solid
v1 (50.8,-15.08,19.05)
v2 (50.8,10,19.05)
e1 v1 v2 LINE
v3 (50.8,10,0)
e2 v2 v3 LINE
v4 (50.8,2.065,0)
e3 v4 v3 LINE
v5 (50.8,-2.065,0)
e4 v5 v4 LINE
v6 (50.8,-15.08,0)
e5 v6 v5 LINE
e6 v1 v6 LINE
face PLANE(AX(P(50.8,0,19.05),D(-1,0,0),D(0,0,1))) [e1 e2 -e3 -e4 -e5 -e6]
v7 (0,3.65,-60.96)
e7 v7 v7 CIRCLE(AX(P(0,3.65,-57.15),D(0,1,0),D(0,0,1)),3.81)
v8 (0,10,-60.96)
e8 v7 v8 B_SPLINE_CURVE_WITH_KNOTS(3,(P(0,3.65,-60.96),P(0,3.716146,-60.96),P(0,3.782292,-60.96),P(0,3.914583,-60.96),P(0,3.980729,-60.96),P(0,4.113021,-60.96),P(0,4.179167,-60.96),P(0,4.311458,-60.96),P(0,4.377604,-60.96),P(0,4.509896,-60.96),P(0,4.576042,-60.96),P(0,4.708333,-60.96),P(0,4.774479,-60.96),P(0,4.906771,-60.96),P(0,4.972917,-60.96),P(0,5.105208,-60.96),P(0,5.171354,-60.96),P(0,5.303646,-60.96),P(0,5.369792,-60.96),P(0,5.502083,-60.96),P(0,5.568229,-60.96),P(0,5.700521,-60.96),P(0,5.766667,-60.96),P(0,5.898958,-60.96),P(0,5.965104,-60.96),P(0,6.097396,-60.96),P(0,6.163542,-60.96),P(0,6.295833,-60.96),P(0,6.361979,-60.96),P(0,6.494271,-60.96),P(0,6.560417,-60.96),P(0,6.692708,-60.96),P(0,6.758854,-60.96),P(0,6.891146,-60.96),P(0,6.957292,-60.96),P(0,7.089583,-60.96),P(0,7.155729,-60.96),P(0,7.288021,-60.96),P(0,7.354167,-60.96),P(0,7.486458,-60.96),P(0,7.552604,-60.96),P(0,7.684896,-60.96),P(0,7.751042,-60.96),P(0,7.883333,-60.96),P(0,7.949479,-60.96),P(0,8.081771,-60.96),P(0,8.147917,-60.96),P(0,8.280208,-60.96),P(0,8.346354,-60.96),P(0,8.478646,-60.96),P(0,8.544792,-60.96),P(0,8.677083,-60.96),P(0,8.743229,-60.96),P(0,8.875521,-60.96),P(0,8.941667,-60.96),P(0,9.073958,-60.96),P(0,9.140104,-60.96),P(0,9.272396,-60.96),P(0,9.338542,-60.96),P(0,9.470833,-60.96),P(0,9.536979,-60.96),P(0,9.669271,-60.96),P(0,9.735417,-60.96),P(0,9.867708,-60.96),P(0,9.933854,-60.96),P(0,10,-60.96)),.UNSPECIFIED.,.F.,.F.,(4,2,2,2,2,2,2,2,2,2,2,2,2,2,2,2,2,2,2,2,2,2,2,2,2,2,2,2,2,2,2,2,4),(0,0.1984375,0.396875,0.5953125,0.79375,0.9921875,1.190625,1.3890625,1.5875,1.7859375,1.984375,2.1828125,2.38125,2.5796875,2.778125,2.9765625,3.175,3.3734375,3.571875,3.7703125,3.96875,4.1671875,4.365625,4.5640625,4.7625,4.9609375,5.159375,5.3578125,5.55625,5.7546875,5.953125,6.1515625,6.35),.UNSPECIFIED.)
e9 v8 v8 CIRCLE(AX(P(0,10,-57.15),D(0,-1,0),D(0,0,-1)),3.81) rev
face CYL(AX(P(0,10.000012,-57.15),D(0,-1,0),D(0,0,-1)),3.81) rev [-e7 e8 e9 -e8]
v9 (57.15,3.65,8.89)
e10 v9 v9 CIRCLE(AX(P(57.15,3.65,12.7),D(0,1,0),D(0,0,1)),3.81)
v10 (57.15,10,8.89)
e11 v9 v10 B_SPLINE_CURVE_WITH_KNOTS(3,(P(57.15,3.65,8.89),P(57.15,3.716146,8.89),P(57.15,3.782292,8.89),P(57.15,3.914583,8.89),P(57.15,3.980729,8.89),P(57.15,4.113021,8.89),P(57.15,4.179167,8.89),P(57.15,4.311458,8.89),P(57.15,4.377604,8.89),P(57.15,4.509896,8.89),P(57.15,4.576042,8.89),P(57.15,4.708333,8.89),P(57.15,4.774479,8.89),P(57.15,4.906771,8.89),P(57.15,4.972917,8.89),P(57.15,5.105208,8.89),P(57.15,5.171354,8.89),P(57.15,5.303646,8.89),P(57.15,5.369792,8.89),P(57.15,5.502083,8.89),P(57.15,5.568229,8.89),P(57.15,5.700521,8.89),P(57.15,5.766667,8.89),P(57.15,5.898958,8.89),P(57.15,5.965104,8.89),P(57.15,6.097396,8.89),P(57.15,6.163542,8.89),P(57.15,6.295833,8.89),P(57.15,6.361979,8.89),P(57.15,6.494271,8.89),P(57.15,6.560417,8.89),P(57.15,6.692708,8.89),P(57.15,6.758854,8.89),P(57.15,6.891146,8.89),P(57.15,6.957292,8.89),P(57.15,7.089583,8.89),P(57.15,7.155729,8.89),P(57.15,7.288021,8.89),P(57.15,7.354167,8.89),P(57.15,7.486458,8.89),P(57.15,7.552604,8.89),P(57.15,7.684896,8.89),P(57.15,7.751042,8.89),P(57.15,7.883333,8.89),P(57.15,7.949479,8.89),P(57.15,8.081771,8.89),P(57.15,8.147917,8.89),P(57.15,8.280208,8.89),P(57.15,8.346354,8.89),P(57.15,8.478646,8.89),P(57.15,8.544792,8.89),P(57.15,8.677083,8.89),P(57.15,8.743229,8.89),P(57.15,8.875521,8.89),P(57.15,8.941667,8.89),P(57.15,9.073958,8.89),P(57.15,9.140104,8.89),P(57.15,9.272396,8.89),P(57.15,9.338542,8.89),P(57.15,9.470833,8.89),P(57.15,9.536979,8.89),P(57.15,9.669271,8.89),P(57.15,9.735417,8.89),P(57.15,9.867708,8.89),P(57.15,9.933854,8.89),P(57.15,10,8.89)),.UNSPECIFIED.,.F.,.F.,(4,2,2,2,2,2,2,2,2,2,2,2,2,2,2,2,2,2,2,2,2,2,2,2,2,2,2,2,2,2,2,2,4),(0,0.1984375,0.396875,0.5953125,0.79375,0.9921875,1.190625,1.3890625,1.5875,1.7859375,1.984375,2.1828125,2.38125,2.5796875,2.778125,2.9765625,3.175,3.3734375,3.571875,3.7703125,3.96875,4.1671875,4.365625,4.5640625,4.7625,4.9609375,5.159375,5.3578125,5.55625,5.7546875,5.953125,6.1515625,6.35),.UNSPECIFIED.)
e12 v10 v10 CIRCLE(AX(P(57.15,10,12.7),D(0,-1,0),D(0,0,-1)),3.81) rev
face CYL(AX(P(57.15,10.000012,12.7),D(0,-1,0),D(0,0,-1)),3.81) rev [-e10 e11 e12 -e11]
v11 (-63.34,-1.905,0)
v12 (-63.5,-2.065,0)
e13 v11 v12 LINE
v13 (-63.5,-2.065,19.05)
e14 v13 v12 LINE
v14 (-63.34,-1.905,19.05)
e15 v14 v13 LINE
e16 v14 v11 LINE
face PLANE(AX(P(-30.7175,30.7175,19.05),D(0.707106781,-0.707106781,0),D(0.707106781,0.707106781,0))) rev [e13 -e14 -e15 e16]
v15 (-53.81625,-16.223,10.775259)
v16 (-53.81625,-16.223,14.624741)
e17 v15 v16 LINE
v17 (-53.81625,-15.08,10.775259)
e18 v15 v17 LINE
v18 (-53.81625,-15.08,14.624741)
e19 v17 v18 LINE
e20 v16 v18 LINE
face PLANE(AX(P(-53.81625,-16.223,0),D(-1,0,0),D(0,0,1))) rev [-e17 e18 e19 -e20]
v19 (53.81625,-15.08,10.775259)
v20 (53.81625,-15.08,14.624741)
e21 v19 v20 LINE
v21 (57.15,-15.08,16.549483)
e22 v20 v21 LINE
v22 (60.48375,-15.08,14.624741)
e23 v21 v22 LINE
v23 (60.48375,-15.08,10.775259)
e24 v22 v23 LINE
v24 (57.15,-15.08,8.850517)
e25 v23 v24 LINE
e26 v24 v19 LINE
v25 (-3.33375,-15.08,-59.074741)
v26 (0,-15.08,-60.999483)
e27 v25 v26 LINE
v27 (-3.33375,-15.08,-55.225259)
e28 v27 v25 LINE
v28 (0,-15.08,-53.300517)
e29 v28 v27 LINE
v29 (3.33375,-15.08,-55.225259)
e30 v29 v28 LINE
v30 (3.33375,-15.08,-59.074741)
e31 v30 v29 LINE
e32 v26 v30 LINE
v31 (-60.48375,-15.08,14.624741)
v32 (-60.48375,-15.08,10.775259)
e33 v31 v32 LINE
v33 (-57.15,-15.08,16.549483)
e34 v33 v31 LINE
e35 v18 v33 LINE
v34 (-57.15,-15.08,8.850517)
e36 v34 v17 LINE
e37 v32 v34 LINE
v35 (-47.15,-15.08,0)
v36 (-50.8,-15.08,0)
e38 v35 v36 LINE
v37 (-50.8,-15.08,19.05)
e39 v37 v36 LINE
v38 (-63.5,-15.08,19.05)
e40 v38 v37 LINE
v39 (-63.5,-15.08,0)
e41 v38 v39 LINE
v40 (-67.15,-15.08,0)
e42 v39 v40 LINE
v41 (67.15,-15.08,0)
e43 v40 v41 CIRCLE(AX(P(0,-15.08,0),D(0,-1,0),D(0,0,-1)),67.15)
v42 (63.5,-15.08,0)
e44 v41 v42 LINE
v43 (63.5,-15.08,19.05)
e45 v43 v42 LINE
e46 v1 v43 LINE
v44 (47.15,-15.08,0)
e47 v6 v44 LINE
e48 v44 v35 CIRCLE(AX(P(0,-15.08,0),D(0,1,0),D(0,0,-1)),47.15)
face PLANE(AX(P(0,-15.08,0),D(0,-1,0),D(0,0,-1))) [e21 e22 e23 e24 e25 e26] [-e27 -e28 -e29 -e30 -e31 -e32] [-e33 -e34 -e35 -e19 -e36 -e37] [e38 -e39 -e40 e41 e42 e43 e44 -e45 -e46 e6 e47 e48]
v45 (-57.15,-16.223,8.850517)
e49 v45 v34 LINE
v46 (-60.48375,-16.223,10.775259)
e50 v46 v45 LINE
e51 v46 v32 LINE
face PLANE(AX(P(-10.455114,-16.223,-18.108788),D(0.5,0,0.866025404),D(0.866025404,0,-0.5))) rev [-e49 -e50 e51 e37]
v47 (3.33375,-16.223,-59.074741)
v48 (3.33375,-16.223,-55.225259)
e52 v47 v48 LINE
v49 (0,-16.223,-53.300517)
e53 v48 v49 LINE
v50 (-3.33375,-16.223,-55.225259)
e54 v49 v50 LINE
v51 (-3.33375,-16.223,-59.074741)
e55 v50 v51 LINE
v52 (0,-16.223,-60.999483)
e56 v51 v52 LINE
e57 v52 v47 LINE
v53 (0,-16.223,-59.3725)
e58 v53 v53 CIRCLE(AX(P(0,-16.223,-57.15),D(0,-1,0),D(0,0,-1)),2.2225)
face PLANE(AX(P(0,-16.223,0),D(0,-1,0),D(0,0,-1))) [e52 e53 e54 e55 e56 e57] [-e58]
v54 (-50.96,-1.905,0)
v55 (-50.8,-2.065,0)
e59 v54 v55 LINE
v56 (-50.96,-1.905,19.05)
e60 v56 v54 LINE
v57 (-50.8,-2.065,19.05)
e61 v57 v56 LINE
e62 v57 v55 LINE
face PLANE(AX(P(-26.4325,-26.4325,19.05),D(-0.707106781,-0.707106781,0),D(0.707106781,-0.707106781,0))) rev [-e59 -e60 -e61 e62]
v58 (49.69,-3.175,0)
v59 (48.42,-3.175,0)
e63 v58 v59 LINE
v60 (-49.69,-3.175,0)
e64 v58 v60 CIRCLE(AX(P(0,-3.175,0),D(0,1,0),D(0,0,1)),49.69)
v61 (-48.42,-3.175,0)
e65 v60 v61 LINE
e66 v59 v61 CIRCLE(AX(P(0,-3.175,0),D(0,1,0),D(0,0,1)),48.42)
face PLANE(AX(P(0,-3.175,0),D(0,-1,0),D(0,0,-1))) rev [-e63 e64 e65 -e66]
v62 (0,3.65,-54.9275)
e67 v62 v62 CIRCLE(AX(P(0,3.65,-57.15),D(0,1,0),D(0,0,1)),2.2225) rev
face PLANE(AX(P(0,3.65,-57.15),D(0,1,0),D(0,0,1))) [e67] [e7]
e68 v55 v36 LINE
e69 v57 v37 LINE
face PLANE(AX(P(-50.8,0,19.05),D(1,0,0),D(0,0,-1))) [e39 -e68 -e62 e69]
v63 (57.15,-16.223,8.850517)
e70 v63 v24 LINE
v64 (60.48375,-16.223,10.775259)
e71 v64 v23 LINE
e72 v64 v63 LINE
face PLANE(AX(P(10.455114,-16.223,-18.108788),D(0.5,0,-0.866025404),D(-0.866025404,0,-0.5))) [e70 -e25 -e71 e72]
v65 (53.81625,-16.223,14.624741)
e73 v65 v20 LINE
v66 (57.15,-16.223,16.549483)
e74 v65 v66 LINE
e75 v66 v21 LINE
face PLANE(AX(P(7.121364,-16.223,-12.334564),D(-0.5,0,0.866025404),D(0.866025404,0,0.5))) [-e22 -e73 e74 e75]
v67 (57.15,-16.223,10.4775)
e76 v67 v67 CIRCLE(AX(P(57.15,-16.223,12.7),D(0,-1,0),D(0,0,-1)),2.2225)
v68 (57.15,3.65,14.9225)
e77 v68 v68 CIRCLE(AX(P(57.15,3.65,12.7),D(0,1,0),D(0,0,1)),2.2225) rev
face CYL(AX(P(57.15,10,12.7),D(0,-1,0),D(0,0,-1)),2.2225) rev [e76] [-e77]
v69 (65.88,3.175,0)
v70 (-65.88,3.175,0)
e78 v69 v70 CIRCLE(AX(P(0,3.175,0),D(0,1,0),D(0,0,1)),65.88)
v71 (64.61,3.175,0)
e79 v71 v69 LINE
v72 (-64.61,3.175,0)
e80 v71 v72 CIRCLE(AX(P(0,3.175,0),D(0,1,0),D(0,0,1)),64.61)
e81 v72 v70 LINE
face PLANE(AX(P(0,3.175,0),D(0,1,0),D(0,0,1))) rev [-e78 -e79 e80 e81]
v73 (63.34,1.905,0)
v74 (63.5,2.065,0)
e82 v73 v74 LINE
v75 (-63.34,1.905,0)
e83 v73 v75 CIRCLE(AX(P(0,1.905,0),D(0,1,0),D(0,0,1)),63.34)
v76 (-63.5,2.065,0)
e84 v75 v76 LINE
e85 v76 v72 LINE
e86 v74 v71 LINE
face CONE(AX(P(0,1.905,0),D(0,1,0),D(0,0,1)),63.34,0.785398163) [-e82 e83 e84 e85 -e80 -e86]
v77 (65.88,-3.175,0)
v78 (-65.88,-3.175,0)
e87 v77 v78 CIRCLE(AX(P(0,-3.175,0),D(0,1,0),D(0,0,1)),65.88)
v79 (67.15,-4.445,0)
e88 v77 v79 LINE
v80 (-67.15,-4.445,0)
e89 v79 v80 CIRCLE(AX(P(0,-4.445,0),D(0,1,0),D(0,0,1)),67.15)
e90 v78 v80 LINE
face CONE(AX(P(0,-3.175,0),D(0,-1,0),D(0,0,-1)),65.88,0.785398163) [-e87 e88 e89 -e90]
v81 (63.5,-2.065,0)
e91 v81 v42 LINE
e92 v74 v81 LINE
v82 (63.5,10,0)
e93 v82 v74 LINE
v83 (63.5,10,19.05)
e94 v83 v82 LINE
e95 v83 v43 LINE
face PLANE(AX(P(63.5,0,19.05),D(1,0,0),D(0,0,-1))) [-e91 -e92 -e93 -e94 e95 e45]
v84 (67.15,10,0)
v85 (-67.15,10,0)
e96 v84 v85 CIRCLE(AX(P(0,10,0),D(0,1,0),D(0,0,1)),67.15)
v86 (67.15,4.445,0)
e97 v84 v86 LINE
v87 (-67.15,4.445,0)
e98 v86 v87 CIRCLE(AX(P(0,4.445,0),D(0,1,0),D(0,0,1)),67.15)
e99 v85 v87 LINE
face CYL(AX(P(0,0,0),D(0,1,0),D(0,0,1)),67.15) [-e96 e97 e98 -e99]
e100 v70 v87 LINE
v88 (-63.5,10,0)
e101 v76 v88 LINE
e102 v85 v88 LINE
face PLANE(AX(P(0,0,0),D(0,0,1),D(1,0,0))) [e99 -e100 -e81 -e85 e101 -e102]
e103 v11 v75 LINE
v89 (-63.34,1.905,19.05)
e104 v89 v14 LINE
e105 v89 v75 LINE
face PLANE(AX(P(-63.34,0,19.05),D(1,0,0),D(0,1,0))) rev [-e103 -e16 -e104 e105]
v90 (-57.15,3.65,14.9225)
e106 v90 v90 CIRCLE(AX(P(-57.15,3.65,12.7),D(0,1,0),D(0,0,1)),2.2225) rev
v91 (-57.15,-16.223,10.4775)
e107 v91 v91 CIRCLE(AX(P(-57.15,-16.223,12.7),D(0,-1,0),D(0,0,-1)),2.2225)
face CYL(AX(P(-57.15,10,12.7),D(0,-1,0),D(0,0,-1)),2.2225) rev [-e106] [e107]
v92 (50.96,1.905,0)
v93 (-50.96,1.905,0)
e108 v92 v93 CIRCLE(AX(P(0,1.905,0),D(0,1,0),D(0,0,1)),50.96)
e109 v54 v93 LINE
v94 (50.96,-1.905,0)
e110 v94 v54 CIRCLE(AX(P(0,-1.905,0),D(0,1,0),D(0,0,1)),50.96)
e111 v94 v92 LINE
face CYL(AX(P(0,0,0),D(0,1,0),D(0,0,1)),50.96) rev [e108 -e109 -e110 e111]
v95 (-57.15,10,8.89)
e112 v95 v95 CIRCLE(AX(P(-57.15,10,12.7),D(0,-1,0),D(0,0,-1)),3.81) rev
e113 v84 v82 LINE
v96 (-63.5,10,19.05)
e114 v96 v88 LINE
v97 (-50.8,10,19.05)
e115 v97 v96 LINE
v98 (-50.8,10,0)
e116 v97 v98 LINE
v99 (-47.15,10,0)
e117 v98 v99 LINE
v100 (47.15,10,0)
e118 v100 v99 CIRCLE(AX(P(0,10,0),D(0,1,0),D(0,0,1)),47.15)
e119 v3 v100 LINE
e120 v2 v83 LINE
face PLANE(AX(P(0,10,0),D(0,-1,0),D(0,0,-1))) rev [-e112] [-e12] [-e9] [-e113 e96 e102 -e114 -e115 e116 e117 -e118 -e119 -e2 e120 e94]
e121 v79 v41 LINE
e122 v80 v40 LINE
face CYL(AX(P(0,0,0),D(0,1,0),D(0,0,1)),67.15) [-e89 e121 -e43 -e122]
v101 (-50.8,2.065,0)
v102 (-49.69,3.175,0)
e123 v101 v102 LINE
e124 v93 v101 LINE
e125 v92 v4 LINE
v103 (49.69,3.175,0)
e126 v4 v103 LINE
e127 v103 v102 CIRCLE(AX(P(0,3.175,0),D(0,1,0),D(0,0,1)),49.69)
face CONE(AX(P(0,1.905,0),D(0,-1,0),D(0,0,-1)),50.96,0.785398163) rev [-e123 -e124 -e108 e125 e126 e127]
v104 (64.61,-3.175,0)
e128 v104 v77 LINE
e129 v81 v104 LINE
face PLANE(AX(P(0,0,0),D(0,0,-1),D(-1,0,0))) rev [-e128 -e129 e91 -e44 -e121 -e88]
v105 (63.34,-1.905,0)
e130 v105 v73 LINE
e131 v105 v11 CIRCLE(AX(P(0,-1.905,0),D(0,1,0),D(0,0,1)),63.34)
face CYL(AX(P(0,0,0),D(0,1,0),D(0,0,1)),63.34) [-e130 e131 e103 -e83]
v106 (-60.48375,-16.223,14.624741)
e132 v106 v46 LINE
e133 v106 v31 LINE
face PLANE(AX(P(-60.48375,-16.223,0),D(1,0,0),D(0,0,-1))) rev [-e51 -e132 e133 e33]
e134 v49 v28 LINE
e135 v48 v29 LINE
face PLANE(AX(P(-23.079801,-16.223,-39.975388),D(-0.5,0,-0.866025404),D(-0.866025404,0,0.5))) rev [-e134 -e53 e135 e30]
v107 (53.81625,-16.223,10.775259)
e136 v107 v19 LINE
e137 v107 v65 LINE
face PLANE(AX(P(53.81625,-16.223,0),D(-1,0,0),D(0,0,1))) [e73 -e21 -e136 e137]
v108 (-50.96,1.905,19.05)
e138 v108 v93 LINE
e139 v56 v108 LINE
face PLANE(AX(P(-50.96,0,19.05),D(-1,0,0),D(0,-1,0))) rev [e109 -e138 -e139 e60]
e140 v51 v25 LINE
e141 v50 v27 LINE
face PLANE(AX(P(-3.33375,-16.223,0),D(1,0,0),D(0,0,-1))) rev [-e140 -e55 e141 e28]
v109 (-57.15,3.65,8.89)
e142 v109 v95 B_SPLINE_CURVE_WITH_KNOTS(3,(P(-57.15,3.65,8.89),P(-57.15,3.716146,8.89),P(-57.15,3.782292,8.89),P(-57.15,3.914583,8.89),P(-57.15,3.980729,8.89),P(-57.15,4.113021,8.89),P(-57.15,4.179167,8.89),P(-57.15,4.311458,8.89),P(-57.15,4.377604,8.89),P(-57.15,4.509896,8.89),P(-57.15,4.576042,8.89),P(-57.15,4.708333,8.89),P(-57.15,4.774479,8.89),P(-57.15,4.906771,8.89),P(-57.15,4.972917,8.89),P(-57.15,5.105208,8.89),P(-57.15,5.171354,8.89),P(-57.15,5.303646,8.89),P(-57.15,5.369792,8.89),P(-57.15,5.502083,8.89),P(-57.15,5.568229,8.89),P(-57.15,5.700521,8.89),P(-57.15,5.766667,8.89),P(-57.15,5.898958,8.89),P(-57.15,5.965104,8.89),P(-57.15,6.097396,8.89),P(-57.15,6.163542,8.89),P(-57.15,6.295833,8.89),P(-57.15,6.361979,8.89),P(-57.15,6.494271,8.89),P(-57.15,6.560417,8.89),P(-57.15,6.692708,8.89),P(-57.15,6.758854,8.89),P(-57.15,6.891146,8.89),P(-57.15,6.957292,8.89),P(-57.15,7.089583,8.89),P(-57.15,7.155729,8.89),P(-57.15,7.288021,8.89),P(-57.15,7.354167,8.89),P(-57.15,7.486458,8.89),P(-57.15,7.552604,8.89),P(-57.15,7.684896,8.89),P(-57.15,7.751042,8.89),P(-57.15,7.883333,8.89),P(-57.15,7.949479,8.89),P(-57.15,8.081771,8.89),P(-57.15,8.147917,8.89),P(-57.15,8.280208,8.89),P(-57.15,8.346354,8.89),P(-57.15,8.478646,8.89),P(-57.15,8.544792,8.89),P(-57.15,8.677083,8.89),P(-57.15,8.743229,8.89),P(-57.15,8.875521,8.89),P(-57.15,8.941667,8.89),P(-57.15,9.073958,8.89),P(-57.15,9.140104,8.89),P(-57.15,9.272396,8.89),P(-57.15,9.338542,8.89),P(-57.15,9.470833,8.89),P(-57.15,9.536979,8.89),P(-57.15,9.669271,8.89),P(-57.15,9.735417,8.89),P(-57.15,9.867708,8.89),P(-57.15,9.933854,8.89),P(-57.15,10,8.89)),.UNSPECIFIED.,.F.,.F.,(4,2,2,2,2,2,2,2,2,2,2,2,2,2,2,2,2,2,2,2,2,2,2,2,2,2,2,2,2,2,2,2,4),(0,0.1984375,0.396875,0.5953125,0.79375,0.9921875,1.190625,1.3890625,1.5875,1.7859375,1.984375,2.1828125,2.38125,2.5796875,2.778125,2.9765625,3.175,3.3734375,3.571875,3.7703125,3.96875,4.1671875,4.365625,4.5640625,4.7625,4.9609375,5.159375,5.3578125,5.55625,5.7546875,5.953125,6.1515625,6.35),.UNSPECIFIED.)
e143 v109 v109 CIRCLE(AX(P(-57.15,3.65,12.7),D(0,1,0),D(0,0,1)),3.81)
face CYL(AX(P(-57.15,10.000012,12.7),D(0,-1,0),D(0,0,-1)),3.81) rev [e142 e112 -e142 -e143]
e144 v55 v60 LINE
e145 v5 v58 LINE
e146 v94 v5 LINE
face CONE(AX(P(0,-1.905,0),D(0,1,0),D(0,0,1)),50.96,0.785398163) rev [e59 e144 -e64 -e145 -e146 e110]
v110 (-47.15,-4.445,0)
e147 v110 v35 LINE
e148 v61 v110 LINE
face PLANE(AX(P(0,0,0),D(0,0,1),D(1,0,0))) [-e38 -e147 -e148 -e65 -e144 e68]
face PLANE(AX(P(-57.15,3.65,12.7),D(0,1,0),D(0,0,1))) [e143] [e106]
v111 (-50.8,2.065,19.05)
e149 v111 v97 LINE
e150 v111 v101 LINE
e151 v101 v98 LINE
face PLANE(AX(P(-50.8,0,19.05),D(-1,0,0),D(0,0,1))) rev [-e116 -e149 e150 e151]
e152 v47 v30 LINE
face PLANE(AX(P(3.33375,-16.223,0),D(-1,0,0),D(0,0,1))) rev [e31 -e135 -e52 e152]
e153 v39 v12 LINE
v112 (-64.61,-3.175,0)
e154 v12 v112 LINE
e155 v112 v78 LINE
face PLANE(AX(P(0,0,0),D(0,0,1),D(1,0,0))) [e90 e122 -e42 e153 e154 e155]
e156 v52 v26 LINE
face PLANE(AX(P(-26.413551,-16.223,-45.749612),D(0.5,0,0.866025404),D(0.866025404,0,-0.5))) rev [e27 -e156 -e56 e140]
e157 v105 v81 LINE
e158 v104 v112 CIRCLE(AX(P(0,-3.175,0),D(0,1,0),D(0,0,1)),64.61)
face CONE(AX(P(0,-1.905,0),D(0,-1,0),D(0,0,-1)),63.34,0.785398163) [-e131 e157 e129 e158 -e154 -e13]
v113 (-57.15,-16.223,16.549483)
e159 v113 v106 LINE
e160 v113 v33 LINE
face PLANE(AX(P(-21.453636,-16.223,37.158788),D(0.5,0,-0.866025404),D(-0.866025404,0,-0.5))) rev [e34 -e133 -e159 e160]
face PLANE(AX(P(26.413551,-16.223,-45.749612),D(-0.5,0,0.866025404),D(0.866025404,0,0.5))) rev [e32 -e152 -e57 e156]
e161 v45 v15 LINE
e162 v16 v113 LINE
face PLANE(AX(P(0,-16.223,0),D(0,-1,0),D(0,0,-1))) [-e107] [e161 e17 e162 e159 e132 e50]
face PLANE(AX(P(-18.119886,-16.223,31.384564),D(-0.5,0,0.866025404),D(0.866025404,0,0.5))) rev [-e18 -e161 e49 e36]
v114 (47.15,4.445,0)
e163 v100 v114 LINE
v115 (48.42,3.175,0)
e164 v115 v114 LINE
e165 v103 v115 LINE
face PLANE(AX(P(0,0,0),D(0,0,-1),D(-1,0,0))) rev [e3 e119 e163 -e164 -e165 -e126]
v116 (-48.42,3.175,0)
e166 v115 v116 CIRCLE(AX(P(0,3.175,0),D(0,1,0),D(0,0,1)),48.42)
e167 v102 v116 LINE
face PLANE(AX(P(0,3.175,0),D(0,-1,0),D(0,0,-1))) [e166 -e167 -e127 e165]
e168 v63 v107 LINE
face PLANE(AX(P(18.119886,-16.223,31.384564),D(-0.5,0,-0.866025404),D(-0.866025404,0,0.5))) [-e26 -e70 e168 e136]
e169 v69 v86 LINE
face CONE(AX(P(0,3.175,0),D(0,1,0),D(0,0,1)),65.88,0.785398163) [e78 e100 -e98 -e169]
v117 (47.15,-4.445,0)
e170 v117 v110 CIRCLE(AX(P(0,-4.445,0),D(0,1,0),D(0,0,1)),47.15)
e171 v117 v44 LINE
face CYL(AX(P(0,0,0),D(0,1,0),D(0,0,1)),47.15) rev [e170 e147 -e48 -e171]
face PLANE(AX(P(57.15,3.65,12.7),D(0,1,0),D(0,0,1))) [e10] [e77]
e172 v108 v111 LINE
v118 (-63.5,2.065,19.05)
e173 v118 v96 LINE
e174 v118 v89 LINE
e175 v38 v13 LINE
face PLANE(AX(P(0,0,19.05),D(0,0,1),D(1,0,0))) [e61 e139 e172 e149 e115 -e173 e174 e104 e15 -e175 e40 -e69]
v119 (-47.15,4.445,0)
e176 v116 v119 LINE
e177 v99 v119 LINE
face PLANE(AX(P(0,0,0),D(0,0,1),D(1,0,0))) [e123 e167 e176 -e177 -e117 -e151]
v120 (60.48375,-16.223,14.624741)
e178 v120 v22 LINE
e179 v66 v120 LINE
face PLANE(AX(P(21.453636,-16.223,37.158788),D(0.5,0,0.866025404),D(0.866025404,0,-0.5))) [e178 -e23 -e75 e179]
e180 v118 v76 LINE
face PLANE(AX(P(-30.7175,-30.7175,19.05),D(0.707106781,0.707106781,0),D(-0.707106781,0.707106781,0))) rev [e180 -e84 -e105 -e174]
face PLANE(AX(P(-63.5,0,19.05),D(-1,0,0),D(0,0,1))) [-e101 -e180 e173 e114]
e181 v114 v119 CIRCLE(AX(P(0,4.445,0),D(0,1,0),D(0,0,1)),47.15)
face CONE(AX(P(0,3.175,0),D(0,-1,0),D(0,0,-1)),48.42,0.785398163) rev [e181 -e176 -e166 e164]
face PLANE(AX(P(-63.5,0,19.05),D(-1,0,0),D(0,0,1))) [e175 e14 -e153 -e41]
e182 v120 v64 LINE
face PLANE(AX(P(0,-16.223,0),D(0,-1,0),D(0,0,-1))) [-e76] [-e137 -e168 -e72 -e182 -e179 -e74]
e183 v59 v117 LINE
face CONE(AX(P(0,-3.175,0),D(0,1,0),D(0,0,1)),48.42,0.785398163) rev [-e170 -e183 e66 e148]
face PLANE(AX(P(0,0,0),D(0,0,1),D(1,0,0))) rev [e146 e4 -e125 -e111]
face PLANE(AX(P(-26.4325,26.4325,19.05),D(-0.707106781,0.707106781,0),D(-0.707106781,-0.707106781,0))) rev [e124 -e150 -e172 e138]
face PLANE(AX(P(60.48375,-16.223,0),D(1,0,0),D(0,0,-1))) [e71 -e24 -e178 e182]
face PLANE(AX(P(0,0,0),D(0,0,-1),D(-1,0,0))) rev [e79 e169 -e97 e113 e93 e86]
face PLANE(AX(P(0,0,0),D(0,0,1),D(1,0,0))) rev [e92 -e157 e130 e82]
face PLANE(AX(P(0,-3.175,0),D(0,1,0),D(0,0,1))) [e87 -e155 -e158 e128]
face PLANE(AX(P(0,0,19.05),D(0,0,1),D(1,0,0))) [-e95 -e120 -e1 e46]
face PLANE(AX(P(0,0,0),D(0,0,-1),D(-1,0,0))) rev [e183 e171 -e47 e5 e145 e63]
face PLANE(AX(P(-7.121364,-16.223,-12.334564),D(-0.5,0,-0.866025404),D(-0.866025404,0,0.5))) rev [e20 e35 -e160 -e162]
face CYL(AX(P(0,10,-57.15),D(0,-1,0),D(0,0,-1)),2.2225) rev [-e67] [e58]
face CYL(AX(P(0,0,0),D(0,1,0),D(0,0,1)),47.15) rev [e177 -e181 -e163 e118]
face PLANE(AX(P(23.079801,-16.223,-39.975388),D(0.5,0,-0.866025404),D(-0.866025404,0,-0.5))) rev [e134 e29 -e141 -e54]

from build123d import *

# Parameters (mm, degrees)
REVOLVE1_ANGLE          = 180
BOSS_EXTRUDE1_DEPTH     = 5.08
BOSS_EXTRUDE2_OUTLINE_W = 12.7
BOSS_EXTRUDE2_OUTLINE_H = 25.08
BOSS_EXTRUDE2_DEPTH     = 19.05
CUT_EXTRUDE2_DEPTH      = 99.22042252
CUT_EXTRUDE2_DEPTH_BACK = 99.22042252
SKETCH5_R               = 2.2225
CUT_EXTRUDE3_DEPTH      = 99.22042252
CUT_EXTRUDE3_DEPTH_BACK = 6.35
SKETCH7_R               = 3.81
BOSS_EXTRUDE3_START     = 1.143
SKETCH5_8_R             = 2.2225
BOSS_EXTRUDE3_DEPTH     = 1.143


# Read off the part's stored shape, not the designer's step: Boss-Extrude2
with BuildPart() as part:
    # Sketch1 → Revolve1 (revolve)
    with BuildSketch(Plane.XY):
        Polygon((-67.15, 10), (-47.15, 10), (-47.15, 4.445), (-48.42, 3.175), (-49.69, 3.175), (-50.96, 1.905), (-50.96, -1.905), (-49.69, -3.175), (-48.42, -3.175), (-47.15, -4.445), (-47.15, -10), (-67.15, -10), (-67.15, -4.445), (-65.88, -3.175), (-64.61, -3.175), (-63.34, -1.905), (-63.34, 1.905), (-64.61, 3.175), (-65.88, 3.175), (-67.15, 4.445), align=None)
    revolve(axis=Axis((0, 0, 0), (0, -1, 0)), revolution_arc=REVOLVE1_ANGLE)

    # Sketch3 → Boss-Extrude1 (add)
    with BuildSketch(Plane.XZ.offset(10)):
        with BuildLine():
            Line((-47.15, 0), (-67.15, 0))
            ThreePointArc((-67.15, 0), (0, -67.15), (67.15, 0))
            Line((67.15, 0), (47.15, 0))
            ThreePointArc((47.15, 0), (0, -47.15), (-47.15, 0))
        make_face()
    extrude(amount=BOSS_EXTRUDE1_DEPTH)

    # Boss-Extrude2 outline → Boss-Extrude2 (add)
    with BuildSketch(Plane.XY):
        Polygon((-50.8, 10), (-63.5, 10), (-63.5, 2.065), (-63.34, 1.905), (-63.34, -1.905), (-63.5, -2.065), (-63.5, -15.08), (-50.8, -15.08), (-50.8, -2.065), (-50.96, -1.905), (-50.96, 1.905), (-50.8, 2.065), align=None)
        with Locations((57.15, -2.54)):
            Rectangle(BOSS_EXTRUDE2_OUTLINE_W, BOSS_EXTRUDE2_OUTLINE_H)
    extrude(amount=BOSS_EXTRUDE2_DEPTH)

    # Sketch5 → Cut-Extrude2 (cut, two sides: drawn at the far end of the back side and taken through both)
    with BuildSketch(Plane.XZ.offset(15.08).offset(-CUT_EXTRUDE2_DEPTH_BACK)):
        with BuildLine():
            ThreePointArc((-54.9275, 12.7), (-55.578455179, 14.271544821), (-57.15, 14.9225))
            Line((-57.15, 14.9225), (-57.15, 10.4775))
            ThreePointArc((-57.15, 10.4775), (-55.578455179, 11.128455179), (-54.9275, 12.7))
        make_face()
        with BuildLine():
            Line((-57.15, 10.4775), (-57.15, 14.9225))
            ThreePointArc((-57.15, 14.9225), (-59.3725, 12.7), (-57.15, 10.4775))
        make_face()
        with Locations(Location((0, -57.15, 0), (0, 0, 270))):
            Circle(SKETCH5_R)
        with Locations(Location((57.15, 12.7, 0), (0, 0, 270))):
            Circle(SKETCH5_R)
    extrude(amount=CUT_EXTRUDE2_DEPTH + CUT_EXTRUDE2_DEPTH_BACK, mode=Mode.SUBTRACT)

    # Sketch7 → Cut-Extrude3 (cut, two sides: drawn at the far end of the back side and taken through both)
    with BuildSketch(Plane(origin=(0, 10, 0), x_dir=(1, 0, 0), z_dir=(0, 1, 0)).offset(-CUT_EXTRUDE3_DEPTH_BACK)):
        with Locations(Location((0, 57.15, 0), (0, 0, 90))):
            Circle(SKETCH7_R)
        with Locations(Location((-57.15, -12.7, 0), (0, 0, 90))):
            Circle(SKETCH7_R)
        with Locations(Location((57.15, -12.7, 0), (0, 0, 90))):
            Circle(SKETCH7_R)
    extrude(amount=CUT_EXTRUDE3_DEPTH + CUT_EXTRUDE3_DEPTH_BACK, mode=Mode.SUBTRACT)

    # Sketch5<8> → Boss-Extrude3 (add)
    # profile 1 of 3: a face of its own
    with BuildSketch(Plane.XZ.offset(15.08).offset(BOSS_EXTRUDE3_START)):
        Polygon((-57.15, 16.54948292), (-60.48375, 14.62474146), (-60.48375, 10.77525854), (-57.15, 8.85051708), (-53.81625, 10.77525854), (-53.81625, 14.62474146), align=None)
        with Locations(Location((-57.15, 12.7, 0), (0, 0, 270))):
            Circle(SKETCH5_8_R, mode=Mode.SUBTRACT)
    # profile 2 of 3: a face of its own
    with BuildSketch(Plane.XZ.offset(15.08).offset(BOSS_EXTRUDE3_START)):
        Polygon((0, -60.99948292), (3.33375, -59.07474146), (3.33375, -55.22525854), (0, -53.30051708), (-3.33375, -55.22525854), (-3.33375, -59.07474146), align=None)
        with Locations(Location((0, -57.15, 0), (0, 0, 270))):
            Circle(SKETCH5_8_R, mode=Mode.SUBTRACT)
    # profile 3 of 3: a face of its own
    with BuildSketch(Plane.XZ.offset(15.08).offset(BOSS_EXTRUDE3_START)):
        Polygon((53.81625, 14.62474146), (57.15, 16.54948292), (60.48375, 14.62474146), (60.48375, 10.77525854), (57.15, 8.85051708), (53.81625, 10.77525854), align=None)
        with Locations(Location((57.15, 12.7, 0), (0, 0, 270))):
            Circle(SKETCH5_8_R, mode=Mode.SUBTRACT)
    extrude(amount=-BOSS_EXTRUDE3_DEPTH)


solid = part.part
